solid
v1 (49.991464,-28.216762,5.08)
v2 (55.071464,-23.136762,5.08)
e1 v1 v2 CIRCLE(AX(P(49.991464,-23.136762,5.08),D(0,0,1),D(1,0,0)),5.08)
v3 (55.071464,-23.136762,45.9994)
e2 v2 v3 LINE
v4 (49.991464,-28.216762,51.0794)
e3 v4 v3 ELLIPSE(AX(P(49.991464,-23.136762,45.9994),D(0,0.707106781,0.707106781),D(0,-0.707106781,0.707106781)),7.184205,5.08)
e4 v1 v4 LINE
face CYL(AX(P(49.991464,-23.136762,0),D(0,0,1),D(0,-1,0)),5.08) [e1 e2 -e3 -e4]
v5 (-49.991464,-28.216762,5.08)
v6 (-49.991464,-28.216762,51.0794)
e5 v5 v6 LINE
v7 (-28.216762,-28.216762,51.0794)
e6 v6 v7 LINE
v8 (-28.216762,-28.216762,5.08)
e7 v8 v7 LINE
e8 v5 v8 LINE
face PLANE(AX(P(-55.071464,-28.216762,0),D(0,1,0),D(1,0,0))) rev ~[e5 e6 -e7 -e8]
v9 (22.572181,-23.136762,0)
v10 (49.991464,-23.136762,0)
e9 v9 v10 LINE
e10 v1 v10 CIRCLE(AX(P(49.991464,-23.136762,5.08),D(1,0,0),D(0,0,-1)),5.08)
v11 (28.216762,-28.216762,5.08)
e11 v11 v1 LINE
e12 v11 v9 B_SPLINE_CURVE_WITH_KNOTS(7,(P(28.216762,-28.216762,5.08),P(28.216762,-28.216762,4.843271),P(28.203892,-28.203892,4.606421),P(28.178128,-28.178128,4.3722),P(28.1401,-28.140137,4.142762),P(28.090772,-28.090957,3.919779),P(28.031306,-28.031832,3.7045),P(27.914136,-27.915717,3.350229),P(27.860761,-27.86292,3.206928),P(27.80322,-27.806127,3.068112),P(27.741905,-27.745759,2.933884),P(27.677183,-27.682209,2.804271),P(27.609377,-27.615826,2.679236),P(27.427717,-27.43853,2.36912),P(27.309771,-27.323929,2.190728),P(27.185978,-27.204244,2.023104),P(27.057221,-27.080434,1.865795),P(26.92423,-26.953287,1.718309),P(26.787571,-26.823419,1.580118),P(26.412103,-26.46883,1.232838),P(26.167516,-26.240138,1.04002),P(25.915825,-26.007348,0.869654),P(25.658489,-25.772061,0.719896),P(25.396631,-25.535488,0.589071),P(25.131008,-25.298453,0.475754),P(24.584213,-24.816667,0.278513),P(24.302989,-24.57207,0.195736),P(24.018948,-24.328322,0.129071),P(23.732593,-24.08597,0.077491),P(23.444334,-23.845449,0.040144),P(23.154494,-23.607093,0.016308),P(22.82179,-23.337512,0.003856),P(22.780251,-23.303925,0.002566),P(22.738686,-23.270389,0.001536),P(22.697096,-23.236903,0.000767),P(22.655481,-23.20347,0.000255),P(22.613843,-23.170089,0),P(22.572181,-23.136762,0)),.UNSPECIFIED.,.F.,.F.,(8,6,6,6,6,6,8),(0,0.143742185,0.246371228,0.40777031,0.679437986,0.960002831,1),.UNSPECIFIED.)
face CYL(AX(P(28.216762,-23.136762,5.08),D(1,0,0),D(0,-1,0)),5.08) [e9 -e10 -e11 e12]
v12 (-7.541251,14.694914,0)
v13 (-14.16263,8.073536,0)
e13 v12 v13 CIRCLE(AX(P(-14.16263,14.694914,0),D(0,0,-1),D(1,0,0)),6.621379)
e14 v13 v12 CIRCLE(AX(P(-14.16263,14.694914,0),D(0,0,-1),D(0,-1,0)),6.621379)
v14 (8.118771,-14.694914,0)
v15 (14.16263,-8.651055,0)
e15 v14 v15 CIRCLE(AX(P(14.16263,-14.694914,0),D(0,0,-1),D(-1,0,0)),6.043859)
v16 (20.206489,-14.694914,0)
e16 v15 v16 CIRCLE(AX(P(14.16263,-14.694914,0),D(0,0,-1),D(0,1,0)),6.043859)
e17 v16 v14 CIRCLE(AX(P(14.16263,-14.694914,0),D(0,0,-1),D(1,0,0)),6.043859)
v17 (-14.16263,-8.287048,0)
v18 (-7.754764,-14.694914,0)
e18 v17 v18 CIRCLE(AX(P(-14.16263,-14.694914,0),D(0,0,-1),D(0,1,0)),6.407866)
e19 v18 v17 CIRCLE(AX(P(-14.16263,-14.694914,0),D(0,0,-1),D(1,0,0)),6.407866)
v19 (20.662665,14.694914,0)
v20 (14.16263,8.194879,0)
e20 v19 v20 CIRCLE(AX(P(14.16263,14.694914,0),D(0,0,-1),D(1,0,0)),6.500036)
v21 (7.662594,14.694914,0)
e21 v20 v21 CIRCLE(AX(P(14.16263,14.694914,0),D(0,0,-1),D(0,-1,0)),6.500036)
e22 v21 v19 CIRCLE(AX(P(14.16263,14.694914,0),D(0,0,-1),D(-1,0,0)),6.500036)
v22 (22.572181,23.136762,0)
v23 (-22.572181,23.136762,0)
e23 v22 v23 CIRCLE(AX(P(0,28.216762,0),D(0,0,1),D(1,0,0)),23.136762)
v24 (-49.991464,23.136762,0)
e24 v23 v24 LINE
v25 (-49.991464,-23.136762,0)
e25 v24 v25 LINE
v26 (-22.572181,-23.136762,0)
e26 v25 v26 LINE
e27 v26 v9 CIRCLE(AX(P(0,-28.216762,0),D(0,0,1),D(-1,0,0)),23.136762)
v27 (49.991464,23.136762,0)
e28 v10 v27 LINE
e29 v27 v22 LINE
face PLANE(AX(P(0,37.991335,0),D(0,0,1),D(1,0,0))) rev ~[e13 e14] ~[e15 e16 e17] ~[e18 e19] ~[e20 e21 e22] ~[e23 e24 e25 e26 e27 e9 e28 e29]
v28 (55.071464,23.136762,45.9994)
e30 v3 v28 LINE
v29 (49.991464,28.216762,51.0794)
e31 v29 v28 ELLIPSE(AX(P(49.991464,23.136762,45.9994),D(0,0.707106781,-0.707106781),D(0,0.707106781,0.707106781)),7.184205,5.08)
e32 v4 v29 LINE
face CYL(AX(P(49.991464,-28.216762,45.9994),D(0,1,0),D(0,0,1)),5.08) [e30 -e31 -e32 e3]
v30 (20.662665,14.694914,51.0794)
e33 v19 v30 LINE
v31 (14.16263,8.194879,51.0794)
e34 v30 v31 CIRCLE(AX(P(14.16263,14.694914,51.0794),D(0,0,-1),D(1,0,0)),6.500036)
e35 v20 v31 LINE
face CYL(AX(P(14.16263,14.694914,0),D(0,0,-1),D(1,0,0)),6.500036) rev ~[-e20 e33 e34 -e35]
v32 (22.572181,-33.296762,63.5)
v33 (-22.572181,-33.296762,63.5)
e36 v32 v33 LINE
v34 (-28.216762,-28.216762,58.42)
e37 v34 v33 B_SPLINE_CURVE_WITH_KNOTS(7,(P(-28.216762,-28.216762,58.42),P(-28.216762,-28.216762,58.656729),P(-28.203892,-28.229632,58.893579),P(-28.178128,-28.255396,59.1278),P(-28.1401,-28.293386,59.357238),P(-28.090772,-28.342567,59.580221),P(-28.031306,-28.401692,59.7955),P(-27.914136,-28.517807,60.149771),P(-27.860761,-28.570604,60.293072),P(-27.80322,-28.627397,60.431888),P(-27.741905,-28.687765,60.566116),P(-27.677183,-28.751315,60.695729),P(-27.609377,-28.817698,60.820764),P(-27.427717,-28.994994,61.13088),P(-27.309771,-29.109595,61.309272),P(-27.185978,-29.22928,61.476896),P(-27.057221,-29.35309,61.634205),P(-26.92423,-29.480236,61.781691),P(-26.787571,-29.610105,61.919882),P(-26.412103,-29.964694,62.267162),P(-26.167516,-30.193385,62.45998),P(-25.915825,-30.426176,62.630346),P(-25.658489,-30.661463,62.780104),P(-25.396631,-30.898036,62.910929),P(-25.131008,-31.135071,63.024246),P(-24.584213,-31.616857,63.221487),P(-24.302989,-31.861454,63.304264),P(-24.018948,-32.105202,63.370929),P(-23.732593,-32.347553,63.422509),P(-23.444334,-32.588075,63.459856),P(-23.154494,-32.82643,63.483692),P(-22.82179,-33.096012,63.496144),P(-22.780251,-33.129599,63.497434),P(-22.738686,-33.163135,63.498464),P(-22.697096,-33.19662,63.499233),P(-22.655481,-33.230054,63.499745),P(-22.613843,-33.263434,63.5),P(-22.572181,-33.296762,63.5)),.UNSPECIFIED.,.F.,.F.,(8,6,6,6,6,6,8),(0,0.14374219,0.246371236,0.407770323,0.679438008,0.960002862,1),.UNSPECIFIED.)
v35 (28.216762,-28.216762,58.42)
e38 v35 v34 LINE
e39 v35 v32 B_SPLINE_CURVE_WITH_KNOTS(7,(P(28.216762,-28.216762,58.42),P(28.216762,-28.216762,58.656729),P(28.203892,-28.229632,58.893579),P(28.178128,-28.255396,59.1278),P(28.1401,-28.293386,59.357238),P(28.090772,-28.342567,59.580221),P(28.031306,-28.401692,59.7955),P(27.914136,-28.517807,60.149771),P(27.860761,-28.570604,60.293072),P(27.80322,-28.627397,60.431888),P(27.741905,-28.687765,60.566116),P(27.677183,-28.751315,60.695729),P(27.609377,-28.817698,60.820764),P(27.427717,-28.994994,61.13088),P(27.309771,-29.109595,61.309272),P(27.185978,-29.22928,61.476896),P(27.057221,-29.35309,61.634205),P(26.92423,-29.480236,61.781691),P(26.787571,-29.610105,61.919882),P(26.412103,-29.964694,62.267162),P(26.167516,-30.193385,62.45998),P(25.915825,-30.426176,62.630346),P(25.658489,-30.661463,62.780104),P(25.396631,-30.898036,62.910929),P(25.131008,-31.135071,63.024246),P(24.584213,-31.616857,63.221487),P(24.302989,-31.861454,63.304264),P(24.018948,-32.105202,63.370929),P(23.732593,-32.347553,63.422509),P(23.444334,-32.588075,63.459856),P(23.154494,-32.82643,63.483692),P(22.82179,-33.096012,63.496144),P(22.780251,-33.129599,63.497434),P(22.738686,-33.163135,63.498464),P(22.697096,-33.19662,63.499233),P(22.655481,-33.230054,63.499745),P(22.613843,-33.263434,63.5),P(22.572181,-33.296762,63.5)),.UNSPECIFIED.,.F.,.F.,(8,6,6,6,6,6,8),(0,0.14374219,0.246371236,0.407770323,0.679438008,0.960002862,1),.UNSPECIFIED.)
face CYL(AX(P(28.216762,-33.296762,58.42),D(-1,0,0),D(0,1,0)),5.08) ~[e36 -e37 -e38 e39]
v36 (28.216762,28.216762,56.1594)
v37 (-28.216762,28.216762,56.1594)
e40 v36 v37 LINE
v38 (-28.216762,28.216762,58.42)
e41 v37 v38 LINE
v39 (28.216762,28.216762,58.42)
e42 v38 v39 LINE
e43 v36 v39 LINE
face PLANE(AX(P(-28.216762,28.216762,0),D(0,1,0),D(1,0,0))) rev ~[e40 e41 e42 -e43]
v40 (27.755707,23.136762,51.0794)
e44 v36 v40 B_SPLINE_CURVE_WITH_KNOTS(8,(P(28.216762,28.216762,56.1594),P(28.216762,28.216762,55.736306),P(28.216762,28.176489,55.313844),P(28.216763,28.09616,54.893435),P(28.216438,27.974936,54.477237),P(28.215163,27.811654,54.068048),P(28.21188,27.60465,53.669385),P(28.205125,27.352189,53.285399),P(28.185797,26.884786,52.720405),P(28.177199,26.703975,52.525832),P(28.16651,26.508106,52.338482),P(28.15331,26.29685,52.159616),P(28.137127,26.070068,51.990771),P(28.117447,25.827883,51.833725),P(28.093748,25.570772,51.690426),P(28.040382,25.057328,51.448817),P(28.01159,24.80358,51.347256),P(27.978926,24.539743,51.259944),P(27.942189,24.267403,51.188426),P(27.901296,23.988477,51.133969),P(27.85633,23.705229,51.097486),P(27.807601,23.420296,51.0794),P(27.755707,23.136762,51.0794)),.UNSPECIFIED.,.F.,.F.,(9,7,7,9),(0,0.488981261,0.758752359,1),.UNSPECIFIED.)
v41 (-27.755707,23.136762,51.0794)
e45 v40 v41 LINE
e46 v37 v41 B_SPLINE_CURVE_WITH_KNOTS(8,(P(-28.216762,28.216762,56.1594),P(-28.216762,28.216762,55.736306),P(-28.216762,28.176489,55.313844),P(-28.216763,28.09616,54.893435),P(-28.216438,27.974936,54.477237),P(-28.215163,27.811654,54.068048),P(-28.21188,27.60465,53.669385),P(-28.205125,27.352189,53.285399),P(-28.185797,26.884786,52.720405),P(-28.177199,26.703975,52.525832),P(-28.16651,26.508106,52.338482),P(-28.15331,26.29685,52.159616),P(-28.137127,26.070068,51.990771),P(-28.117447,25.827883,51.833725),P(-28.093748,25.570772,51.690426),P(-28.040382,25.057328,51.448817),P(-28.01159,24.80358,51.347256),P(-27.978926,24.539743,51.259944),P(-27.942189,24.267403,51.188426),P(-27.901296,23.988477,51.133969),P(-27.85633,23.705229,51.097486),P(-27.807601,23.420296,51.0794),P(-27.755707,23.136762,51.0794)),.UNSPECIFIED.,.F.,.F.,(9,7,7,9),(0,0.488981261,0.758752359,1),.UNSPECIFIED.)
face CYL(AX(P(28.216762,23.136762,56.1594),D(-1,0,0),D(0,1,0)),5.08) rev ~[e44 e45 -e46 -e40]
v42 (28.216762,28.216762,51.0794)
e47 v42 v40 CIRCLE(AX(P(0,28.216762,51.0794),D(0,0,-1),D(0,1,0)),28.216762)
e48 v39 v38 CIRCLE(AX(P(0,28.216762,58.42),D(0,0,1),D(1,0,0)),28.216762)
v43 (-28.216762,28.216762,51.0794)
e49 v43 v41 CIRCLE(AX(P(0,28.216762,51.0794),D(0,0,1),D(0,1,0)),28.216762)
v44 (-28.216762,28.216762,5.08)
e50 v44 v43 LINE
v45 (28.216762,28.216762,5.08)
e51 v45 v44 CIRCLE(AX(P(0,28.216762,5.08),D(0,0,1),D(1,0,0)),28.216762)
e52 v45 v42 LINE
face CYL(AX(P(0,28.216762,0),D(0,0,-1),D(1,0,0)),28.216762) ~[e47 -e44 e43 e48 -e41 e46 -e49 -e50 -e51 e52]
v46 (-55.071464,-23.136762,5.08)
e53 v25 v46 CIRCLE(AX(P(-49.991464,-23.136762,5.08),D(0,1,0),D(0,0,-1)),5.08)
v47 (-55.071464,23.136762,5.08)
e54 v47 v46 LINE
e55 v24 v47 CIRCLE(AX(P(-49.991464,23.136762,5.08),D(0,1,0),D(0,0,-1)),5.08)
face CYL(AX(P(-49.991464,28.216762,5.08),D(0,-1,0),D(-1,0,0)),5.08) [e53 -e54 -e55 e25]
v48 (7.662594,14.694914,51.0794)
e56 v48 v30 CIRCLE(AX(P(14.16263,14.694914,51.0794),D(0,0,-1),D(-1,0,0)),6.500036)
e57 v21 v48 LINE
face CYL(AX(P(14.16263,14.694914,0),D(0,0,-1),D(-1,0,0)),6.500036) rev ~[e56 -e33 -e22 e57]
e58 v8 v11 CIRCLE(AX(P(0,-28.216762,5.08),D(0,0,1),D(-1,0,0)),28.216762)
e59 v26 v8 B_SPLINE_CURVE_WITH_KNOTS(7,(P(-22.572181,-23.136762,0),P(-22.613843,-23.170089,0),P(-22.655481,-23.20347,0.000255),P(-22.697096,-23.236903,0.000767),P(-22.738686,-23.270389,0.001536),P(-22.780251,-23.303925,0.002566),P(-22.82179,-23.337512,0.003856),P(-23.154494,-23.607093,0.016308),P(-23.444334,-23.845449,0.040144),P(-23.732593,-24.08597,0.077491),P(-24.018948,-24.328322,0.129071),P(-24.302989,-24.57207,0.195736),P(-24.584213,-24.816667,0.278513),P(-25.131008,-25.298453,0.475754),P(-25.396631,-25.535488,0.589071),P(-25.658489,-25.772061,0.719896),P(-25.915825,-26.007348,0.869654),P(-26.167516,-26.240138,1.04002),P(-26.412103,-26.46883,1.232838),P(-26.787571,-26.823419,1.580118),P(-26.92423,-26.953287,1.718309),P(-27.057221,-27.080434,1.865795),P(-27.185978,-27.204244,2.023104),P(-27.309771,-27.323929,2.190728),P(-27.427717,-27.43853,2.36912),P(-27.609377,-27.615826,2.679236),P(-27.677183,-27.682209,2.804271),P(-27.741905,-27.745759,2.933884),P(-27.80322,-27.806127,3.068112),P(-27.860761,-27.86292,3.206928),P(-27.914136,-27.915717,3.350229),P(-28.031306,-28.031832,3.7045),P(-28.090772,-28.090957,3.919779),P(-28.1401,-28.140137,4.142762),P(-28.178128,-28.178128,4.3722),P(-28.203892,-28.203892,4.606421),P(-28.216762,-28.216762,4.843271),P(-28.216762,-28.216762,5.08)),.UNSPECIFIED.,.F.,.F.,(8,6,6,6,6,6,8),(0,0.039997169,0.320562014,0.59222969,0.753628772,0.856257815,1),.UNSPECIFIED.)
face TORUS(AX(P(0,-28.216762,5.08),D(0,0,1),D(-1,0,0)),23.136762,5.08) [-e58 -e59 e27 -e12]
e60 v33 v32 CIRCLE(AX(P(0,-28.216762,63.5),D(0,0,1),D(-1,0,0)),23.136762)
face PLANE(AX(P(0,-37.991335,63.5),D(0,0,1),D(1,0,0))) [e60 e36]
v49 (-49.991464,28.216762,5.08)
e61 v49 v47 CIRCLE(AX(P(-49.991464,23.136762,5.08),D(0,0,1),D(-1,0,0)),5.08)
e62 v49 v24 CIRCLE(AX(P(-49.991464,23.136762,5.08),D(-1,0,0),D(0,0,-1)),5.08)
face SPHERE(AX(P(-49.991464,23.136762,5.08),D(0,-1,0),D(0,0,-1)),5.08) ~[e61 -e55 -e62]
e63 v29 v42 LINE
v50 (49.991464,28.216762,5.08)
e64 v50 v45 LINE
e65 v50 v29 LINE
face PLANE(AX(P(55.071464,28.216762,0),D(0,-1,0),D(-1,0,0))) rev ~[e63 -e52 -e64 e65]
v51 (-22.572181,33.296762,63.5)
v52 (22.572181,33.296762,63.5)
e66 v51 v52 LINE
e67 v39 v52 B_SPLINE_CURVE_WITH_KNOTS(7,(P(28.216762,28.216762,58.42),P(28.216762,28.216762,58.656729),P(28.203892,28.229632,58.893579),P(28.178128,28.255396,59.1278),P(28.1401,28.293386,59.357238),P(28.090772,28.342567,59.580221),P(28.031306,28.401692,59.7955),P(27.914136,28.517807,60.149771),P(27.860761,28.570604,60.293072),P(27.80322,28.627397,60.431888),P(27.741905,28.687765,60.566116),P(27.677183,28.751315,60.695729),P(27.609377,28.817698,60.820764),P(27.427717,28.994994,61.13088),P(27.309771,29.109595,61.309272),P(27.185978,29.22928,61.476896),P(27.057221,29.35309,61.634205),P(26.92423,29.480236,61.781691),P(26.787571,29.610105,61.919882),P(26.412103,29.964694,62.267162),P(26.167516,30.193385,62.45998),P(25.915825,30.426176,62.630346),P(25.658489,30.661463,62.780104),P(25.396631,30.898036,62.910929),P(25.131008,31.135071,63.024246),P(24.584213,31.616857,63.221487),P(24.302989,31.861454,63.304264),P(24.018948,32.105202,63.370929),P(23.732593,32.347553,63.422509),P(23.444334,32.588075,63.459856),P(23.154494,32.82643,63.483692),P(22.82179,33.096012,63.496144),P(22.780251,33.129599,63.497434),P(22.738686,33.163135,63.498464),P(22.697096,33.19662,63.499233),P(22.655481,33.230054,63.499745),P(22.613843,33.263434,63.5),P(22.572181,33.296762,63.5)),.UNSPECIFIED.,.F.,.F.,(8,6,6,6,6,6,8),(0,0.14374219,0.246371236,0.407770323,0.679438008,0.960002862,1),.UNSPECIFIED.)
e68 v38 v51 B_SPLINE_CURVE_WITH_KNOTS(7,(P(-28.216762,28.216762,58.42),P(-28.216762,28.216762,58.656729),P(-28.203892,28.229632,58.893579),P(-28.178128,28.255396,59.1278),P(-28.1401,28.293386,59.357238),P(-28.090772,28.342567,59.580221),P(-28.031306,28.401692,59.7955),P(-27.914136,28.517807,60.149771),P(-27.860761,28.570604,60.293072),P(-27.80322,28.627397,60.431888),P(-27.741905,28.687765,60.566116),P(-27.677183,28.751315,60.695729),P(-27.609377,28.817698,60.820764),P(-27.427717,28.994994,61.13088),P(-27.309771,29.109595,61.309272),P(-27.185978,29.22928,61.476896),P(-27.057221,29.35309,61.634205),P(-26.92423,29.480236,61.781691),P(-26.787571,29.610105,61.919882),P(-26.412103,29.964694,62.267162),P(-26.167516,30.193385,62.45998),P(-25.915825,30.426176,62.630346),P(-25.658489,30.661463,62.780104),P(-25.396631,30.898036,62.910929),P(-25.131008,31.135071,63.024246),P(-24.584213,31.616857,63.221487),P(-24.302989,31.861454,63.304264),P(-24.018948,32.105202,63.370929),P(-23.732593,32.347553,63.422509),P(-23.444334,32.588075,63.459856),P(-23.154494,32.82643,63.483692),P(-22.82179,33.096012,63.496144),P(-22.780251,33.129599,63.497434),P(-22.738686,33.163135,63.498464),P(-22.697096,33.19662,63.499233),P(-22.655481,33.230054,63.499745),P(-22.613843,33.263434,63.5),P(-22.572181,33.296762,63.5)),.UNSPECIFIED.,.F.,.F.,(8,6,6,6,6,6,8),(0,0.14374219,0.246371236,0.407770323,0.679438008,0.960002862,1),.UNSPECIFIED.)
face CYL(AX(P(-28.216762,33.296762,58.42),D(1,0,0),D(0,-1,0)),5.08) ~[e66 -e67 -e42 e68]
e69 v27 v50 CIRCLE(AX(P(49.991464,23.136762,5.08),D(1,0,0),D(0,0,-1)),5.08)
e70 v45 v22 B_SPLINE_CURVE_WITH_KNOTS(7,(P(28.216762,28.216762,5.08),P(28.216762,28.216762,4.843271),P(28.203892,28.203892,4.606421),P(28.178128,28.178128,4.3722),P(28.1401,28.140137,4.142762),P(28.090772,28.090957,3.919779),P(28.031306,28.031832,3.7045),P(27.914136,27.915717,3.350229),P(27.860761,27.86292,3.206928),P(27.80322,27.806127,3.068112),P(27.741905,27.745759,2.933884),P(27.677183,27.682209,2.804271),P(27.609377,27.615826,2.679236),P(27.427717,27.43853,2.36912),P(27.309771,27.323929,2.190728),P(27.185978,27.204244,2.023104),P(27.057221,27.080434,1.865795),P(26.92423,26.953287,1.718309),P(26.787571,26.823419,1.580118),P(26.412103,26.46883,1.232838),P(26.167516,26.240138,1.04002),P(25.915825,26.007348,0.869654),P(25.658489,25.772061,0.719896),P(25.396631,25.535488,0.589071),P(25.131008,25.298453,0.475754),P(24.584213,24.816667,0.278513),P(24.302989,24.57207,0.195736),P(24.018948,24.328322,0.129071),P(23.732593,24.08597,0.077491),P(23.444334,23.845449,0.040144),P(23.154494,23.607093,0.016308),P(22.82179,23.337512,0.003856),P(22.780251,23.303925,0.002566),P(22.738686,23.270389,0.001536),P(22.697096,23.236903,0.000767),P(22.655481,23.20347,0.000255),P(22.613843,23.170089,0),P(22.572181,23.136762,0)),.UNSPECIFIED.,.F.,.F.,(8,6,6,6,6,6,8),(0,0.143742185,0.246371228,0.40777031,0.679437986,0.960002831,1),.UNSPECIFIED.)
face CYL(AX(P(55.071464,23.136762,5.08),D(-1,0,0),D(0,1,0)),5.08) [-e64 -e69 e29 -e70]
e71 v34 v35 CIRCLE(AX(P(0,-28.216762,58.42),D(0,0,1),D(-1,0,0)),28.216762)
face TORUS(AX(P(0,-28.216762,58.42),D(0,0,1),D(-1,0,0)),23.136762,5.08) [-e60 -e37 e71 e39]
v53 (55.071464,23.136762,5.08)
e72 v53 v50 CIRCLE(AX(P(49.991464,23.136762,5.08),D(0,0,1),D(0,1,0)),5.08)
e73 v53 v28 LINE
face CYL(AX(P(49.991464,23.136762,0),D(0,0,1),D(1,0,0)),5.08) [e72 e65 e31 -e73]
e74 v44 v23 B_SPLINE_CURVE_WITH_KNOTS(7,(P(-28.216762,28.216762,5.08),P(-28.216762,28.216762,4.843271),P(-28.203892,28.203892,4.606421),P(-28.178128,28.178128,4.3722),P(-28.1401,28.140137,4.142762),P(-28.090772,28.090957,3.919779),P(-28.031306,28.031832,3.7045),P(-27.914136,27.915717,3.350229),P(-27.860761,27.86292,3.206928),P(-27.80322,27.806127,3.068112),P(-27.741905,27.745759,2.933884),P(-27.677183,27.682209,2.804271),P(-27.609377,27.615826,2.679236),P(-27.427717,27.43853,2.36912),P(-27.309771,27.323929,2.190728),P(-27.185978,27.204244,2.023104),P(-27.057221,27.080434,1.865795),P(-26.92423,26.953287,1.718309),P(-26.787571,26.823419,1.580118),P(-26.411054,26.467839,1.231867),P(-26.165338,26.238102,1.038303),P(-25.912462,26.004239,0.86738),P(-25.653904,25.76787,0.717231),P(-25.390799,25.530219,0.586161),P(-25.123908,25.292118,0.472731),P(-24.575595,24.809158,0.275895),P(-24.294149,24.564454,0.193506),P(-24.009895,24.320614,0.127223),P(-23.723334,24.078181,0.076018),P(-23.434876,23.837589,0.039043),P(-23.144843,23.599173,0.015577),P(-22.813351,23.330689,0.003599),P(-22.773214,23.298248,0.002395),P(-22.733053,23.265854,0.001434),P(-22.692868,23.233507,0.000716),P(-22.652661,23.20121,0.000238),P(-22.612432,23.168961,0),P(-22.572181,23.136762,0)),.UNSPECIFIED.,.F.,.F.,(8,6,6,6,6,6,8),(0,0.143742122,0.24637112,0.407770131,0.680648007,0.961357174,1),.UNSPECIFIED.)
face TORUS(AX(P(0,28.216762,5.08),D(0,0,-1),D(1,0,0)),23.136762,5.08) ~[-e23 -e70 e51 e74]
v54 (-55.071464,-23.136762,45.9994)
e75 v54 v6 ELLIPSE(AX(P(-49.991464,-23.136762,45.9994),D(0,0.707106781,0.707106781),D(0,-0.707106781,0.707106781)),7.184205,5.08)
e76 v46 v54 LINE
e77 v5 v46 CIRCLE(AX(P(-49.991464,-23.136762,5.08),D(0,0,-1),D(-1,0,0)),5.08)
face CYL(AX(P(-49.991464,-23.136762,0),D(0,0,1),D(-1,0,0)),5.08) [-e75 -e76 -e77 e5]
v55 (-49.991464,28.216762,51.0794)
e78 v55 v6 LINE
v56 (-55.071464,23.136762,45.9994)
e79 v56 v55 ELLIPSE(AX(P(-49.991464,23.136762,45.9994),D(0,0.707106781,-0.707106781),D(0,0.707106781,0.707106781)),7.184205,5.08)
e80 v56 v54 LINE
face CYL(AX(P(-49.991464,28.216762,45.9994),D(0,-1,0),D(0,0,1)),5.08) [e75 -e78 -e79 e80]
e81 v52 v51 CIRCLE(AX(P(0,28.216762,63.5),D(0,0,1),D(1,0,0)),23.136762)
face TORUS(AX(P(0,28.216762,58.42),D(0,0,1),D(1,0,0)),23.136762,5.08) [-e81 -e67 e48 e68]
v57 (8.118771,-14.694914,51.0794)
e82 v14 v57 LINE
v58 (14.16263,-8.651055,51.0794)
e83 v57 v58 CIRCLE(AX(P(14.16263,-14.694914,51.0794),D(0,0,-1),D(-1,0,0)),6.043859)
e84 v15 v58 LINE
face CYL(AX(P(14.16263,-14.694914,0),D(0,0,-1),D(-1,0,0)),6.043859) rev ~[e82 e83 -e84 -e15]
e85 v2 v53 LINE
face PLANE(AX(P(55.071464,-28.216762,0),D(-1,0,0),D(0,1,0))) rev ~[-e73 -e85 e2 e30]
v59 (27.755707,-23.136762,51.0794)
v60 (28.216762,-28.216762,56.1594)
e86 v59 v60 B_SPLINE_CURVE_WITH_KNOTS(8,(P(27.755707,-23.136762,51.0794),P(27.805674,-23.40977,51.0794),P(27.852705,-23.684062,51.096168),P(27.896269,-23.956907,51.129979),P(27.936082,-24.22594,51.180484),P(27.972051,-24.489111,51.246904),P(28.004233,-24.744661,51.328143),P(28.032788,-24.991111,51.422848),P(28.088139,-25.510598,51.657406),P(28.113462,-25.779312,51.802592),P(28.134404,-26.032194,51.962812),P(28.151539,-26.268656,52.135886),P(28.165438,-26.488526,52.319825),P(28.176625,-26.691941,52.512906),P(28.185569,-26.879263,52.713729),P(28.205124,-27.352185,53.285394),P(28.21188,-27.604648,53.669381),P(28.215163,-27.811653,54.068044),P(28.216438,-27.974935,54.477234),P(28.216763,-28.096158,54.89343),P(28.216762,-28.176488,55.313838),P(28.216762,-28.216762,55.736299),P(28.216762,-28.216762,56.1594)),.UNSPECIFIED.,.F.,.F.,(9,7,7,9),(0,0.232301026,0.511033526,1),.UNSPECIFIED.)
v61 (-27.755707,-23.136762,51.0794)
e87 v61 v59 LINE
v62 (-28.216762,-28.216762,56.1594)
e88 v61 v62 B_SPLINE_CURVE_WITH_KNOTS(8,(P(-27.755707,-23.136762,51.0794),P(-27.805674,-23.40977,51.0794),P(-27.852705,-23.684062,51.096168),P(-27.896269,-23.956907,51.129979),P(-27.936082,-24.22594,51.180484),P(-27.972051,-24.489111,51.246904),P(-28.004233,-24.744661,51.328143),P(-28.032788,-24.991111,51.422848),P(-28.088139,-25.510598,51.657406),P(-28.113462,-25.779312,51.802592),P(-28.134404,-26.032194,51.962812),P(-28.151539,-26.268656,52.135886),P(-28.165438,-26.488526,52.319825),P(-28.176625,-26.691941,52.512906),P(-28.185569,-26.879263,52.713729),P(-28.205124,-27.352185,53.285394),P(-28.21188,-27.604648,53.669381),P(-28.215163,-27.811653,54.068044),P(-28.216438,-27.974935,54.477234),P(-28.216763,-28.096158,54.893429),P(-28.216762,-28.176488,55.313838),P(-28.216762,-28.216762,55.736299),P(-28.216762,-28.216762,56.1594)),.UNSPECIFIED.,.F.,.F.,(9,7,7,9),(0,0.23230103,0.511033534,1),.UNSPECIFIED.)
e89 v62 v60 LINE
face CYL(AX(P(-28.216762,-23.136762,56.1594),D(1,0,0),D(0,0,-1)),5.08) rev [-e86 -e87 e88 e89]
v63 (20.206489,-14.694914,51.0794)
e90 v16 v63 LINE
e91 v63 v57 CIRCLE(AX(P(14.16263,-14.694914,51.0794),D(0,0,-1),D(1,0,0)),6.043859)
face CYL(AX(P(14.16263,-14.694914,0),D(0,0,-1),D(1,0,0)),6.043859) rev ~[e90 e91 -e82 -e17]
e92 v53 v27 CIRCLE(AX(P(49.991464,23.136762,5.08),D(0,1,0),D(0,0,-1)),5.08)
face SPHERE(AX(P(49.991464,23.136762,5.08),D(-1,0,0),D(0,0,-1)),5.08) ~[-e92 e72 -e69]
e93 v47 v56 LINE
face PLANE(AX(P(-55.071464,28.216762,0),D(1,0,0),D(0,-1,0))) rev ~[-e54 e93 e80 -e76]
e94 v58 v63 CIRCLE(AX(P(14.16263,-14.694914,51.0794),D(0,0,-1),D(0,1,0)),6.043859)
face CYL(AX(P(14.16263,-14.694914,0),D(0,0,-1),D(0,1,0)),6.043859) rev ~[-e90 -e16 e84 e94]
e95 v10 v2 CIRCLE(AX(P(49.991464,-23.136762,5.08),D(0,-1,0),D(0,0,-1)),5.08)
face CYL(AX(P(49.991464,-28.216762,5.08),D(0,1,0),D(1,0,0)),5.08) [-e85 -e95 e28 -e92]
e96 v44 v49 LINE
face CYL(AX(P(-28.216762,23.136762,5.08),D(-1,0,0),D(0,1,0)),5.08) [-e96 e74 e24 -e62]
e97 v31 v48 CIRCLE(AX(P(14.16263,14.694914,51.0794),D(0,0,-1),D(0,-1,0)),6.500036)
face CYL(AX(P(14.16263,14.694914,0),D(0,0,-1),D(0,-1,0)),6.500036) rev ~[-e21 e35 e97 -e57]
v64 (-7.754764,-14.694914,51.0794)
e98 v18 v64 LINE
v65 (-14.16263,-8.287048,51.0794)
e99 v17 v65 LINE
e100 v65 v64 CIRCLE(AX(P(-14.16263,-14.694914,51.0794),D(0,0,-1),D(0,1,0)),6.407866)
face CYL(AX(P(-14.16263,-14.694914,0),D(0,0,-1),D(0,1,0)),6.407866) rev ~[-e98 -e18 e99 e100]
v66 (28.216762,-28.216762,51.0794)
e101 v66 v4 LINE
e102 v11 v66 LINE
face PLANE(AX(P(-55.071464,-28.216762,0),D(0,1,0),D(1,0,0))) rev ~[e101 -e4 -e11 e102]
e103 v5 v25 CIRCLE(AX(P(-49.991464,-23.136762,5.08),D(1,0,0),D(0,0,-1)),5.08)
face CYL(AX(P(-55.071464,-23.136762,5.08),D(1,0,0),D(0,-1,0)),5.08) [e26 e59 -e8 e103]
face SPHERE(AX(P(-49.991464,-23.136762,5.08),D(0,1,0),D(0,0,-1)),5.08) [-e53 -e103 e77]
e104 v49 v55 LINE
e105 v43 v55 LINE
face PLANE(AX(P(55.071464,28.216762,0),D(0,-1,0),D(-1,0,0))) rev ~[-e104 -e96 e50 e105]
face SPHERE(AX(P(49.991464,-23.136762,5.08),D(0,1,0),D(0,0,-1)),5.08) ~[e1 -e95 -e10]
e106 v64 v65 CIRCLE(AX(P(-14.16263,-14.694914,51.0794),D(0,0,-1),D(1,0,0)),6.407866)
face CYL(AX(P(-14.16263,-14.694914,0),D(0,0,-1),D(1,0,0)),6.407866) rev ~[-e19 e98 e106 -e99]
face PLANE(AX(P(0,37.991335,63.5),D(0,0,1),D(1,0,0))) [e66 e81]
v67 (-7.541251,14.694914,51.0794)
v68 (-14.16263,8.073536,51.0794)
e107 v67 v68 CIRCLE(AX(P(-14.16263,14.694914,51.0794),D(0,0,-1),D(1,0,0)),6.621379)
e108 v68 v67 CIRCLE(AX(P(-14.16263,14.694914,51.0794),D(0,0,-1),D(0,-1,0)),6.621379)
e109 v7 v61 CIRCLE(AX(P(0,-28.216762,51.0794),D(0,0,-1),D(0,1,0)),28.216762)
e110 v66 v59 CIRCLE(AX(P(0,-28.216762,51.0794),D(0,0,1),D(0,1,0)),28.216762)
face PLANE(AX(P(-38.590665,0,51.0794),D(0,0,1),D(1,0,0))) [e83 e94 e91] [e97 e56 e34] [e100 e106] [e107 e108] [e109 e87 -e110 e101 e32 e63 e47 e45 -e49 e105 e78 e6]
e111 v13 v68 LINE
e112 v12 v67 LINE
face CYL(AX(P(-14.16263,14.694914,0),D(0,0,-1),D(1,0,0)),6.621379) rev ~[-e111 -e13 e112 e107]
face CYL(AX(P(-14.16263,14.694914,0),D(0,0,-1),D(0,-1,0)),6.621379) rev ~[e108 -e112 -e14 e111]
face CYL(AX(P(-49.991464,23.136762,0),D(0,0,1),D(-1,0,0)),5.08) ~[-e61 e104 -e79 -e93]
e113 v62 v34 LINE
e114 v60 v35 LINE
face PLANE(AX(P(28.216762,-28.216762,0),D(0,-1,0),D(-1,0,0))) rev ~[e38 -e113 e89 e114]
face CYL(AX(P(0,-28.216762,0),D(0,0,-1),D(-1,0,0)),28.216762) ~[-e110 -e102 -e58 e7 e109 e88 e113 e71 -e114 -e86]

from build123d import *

# Parameters (mm, degrees)
F1_DEPTH = 51.0794
F2_DEPTH = 63.5
F3_R     = 5.08


with BuildPart() as f1:
    # F0 (on Top) → F1 (new body)
    with BuildSketch(Plane.XY):
        with BuildLine():
            ThreePointArc((-14.1626298428, 3.8117302825), (-24.4520879277, 14.1355315273), (-28.2167619251, 28.2167619251))
            Line((-28.2167619251, 28.2167619251), (-55.0714641052, 28.2167619251))
            Line((-55.0714641052, 28.2167619251), (-55.0714641052, -28.2167619251))
            Line((-55.0714641052, -28.2167619251), (-28.2167619251, -28.2167619251))
            ThreePointArc((-28.2167619251, -28.2167619251), (-24.4520879277, -14.1355315273), (-14.1626298428, -3.8117302825))
            Line((-14.1626298428, -3.8117302825), (-14.1626298428, 3.8117302825))
        make_face()
        with BuildLine():
            Line((-28.2167619251, -28.2167619251), (28.2167619251, -28.2167619251))
            ThreePointArc((28.2167619251, -28.2167619251), (24.4520879277, -14.1355315273), (14.1626298428, -3.8117302825))
            Line((14.1626298428, -3.8117302825), (14.1626298428, -8.6510551789))
            ThreePointArc((14.1626298428, -8.6510551789), (18.4362835565, -10.421260508), (20.2064888856, -14.6949142218))
            ThreePointArc((20.2064888856, -14.6949142218), (14.1626298428, -20.7387732646), (8.1187707999, -14.6949142218))
            Line((8.1187707999, -14.6949142218), (-7.75476352, -14.6949142218))
            ThreePointArc((-7.75476352, -14.6949142218), (-18.6936755725, -19.2259599515), (-14.1626298428, -8.287047899))
            Line((-14.1626298428, -8.287047899), (-14.1626298428, -3.8117302825))
            ThreePointArc((-14.1626298428, -3.8117302825), (-24.4520879277, -14.1355315273), (-28.2167619251, -28.2167619251))
        make_face()
        with BuildLine():
            ThreePointArc((14.1626298428, 3.8117302825), (24.4520879277, 14.1355315273), (28.2167619251, 28.2167619251))
            Line((28.2167619251, 28.2167619251), (-28.2167619251, 28.2167619251))
            ThreePointArc((-28.2167619251, 28.2167619251), (-24.4520879277, 14.1355315273), (-14.1626298428, 3.8117302825))
            Line((-14.1626298428, 3.8117302825), (-14.1626298428, 8.0735357175))
            ThreePointArc((-14.1626298428, 8.0735357175), (-18.8446514839, 19.3769358629), (-7.5412513385, 14.6949142218))
            Line((-7.5412513385, 14.6949142218), (7.6625943184, 14.6949142218))
            ThreePointArc((7.6625943184, 14.6949142218), (14.1626298428, 21.1949497461), (20.6626653671, 14.6949142218))
            ThreePointArc((20.6626653671, 14.6949142218), (18.75884904, 10.0986950245), (14.1626298428, 8.1948786974))
            Line((14.1626298428, 8.1948786974), (14.1626298428, 3.8117302825))
        make_face()
        with BuildLine():
            Line((55.0714641052, -28.2167619251), (55.0714641052, 28.2167619251))
            Line((55.0714641052, 28.2167619251), (28.2167619251, 28.2167619251))
            ThreePointArc((28.2167619251, 28.2167619251), (24.4520879277, 14.1355315273), (14.1626298428, 3.8117302825))
            Line((14.1626298428, 3.8117302825), (14.1626298428, -3.8117302825))
            ThreePointArc((14.1626298428, -3.8117302825), (24.4520879277, -14.1355315273), (28.2167619251, -28.2167619251))
            Line((28.2167619251, -28.2167619251), (55.0714641052, -28.2167619251))
        make_face()
        with BuildLine():
            ThreePointArc((-1.8e-09, 0), (-7.3333036869, 0.9695912358), (-14.1626298428, 3.8117302825))
            Line((-14.1626298428, 3.8117302825), (-14.1626298428, -3.8117302825))
            ThreePointArc((-14.1626298428, -3.8117302825), (-7.3333036869, -0.9695912358), (-1.8e-09, 0))
        make_face()
        with BuildLine():
            Line((14.1626298428, -3.8117302825), (14.1626298428, 3.8117302825))
            ThreePointArc((14.1626298428, 3.8117302825), (7.3333036852, 0.9695912353), (-1.8e-09, 0))
            ThreePointArc((-1.8e-09, 0), (7.3333036852, -0.9695912353), (14.1626298428, -3.8117302825))
        make_face()
        with BuildLine():
            ThreePointArc((-1.8e-09, 0), (7.3333036852, 0.9695912353), (14.1626298428, 3.8117302825))
            Line((14.1626298428, 3.8117302825), (14.1626298428, 8.1948786974))
            ThreePointArc((14.1626298428, 8.1948786974), (9.5664106455, 10.0986950245), (7.6625943184, 14.6949142218))
            Line((7.6625943184, 14.6949142218), (-7.5412513385, 14.6949142218))
            ThreePointArc((-7.5412513385, 14.6949142218), (-9.4806082016, 10.0128925806), (-14.1626298428, 8.0735357175))
            Line((-14.1626298428, 8.0735357175), (-14.1626298428, 3.8117302825))
            ThreePointArc((-14.1626298428, 3.8117302825), (-7.3333036869, 0.9695912358), (-1.8e-09, 0))
        make_face()
        with BuildLine():
            ThreePointArc((14.1626298428, -3.8117302825), (7.3333036852, -0.9695912353), (-1.8e-09, 0))
            ThreePointArc((-1.8e-09, 0), (-7.3333036869, -0.9695912358), (-14.1626298428, -3.8117302825))
            Line((-14.1626298428, -3.8117302825), (-14.1626298428, -8.287047899))
            ThreePointArc((-14.1626298428, -8.287047899), (-9.631584113, -10.163868492), (-7.75476352, -14.6949142218))
            Line((-7.75476352, -14.6949142218), (8.1187707999, -14.6949142218))
            ThreePointArc((8.1187707999, -14.6949142218), (9.888976129, -10.421260508), (14.1626298428, -8.6510551789))
            Line((14.1626298428, -8.6510551789), (14.1626298428, -3.8117302825))
        make_face()
    extrude(amount=F1_DEPTH)

    # F0 (on Top) → F2 (join)
    with BuildSketch(Plane.XY):
        with BuildLine():
            Line((-28.2167619251, 28.2167619251), (28.2167619251, 28.2167619251))
            ThreePointArc((28.2167619251, 28.2167619251), (0, 56.4335238502), (-28.2167619251, 28.2167619251))
        make_face()
        with BuildLine():
            ThreePointArc((-28.2167619251, -28.2167619251), (0, -56.4335238502), (28.2167619251, -28.2167619251))
            Line((28.2167619251, -28.2167619251), (-28.2167619251, -28.2167619251))
        make_face()
    extrude(amount=F2_DEPTH)

    # F3
    f3_edges = [f1.edges().sort_by_distance(p)[0] for p in [
        (-55.071464, 0, 0),
        (-41.644113, 28.216762, 0),
        (0, 56.433524, 0),
        (41.644113, 28.216762, 0),
        (55.071464, 0, 0),
        (41.644113, -28.216762, 0),
        (0, -56.433524, 0),
        (-41.644113, -28.216762, 0),
        (0, 28.216762, 51.0794),
        (0, 28.216762, 63.5),
        (0, -28.216762, 63.5),
        (0, -28.216762, 51.0794),
        (0, -56.433524, 63.5),
        (0, 56.433524, 63.5),
        (-55.071464, -28.216762, 25.5397),
        (-55.071464, 28.216762, 25.5397),
        (-55.071464, 0, 51.0794),
        (55.071464, -28.216762, 25.5397),
        (55.071464, 0, 51.0794),
        (55.071464, 28.216762, 25.5397),
    ]]
    fillet(f3_edges, radius=F3_R)


solid = f1.part
